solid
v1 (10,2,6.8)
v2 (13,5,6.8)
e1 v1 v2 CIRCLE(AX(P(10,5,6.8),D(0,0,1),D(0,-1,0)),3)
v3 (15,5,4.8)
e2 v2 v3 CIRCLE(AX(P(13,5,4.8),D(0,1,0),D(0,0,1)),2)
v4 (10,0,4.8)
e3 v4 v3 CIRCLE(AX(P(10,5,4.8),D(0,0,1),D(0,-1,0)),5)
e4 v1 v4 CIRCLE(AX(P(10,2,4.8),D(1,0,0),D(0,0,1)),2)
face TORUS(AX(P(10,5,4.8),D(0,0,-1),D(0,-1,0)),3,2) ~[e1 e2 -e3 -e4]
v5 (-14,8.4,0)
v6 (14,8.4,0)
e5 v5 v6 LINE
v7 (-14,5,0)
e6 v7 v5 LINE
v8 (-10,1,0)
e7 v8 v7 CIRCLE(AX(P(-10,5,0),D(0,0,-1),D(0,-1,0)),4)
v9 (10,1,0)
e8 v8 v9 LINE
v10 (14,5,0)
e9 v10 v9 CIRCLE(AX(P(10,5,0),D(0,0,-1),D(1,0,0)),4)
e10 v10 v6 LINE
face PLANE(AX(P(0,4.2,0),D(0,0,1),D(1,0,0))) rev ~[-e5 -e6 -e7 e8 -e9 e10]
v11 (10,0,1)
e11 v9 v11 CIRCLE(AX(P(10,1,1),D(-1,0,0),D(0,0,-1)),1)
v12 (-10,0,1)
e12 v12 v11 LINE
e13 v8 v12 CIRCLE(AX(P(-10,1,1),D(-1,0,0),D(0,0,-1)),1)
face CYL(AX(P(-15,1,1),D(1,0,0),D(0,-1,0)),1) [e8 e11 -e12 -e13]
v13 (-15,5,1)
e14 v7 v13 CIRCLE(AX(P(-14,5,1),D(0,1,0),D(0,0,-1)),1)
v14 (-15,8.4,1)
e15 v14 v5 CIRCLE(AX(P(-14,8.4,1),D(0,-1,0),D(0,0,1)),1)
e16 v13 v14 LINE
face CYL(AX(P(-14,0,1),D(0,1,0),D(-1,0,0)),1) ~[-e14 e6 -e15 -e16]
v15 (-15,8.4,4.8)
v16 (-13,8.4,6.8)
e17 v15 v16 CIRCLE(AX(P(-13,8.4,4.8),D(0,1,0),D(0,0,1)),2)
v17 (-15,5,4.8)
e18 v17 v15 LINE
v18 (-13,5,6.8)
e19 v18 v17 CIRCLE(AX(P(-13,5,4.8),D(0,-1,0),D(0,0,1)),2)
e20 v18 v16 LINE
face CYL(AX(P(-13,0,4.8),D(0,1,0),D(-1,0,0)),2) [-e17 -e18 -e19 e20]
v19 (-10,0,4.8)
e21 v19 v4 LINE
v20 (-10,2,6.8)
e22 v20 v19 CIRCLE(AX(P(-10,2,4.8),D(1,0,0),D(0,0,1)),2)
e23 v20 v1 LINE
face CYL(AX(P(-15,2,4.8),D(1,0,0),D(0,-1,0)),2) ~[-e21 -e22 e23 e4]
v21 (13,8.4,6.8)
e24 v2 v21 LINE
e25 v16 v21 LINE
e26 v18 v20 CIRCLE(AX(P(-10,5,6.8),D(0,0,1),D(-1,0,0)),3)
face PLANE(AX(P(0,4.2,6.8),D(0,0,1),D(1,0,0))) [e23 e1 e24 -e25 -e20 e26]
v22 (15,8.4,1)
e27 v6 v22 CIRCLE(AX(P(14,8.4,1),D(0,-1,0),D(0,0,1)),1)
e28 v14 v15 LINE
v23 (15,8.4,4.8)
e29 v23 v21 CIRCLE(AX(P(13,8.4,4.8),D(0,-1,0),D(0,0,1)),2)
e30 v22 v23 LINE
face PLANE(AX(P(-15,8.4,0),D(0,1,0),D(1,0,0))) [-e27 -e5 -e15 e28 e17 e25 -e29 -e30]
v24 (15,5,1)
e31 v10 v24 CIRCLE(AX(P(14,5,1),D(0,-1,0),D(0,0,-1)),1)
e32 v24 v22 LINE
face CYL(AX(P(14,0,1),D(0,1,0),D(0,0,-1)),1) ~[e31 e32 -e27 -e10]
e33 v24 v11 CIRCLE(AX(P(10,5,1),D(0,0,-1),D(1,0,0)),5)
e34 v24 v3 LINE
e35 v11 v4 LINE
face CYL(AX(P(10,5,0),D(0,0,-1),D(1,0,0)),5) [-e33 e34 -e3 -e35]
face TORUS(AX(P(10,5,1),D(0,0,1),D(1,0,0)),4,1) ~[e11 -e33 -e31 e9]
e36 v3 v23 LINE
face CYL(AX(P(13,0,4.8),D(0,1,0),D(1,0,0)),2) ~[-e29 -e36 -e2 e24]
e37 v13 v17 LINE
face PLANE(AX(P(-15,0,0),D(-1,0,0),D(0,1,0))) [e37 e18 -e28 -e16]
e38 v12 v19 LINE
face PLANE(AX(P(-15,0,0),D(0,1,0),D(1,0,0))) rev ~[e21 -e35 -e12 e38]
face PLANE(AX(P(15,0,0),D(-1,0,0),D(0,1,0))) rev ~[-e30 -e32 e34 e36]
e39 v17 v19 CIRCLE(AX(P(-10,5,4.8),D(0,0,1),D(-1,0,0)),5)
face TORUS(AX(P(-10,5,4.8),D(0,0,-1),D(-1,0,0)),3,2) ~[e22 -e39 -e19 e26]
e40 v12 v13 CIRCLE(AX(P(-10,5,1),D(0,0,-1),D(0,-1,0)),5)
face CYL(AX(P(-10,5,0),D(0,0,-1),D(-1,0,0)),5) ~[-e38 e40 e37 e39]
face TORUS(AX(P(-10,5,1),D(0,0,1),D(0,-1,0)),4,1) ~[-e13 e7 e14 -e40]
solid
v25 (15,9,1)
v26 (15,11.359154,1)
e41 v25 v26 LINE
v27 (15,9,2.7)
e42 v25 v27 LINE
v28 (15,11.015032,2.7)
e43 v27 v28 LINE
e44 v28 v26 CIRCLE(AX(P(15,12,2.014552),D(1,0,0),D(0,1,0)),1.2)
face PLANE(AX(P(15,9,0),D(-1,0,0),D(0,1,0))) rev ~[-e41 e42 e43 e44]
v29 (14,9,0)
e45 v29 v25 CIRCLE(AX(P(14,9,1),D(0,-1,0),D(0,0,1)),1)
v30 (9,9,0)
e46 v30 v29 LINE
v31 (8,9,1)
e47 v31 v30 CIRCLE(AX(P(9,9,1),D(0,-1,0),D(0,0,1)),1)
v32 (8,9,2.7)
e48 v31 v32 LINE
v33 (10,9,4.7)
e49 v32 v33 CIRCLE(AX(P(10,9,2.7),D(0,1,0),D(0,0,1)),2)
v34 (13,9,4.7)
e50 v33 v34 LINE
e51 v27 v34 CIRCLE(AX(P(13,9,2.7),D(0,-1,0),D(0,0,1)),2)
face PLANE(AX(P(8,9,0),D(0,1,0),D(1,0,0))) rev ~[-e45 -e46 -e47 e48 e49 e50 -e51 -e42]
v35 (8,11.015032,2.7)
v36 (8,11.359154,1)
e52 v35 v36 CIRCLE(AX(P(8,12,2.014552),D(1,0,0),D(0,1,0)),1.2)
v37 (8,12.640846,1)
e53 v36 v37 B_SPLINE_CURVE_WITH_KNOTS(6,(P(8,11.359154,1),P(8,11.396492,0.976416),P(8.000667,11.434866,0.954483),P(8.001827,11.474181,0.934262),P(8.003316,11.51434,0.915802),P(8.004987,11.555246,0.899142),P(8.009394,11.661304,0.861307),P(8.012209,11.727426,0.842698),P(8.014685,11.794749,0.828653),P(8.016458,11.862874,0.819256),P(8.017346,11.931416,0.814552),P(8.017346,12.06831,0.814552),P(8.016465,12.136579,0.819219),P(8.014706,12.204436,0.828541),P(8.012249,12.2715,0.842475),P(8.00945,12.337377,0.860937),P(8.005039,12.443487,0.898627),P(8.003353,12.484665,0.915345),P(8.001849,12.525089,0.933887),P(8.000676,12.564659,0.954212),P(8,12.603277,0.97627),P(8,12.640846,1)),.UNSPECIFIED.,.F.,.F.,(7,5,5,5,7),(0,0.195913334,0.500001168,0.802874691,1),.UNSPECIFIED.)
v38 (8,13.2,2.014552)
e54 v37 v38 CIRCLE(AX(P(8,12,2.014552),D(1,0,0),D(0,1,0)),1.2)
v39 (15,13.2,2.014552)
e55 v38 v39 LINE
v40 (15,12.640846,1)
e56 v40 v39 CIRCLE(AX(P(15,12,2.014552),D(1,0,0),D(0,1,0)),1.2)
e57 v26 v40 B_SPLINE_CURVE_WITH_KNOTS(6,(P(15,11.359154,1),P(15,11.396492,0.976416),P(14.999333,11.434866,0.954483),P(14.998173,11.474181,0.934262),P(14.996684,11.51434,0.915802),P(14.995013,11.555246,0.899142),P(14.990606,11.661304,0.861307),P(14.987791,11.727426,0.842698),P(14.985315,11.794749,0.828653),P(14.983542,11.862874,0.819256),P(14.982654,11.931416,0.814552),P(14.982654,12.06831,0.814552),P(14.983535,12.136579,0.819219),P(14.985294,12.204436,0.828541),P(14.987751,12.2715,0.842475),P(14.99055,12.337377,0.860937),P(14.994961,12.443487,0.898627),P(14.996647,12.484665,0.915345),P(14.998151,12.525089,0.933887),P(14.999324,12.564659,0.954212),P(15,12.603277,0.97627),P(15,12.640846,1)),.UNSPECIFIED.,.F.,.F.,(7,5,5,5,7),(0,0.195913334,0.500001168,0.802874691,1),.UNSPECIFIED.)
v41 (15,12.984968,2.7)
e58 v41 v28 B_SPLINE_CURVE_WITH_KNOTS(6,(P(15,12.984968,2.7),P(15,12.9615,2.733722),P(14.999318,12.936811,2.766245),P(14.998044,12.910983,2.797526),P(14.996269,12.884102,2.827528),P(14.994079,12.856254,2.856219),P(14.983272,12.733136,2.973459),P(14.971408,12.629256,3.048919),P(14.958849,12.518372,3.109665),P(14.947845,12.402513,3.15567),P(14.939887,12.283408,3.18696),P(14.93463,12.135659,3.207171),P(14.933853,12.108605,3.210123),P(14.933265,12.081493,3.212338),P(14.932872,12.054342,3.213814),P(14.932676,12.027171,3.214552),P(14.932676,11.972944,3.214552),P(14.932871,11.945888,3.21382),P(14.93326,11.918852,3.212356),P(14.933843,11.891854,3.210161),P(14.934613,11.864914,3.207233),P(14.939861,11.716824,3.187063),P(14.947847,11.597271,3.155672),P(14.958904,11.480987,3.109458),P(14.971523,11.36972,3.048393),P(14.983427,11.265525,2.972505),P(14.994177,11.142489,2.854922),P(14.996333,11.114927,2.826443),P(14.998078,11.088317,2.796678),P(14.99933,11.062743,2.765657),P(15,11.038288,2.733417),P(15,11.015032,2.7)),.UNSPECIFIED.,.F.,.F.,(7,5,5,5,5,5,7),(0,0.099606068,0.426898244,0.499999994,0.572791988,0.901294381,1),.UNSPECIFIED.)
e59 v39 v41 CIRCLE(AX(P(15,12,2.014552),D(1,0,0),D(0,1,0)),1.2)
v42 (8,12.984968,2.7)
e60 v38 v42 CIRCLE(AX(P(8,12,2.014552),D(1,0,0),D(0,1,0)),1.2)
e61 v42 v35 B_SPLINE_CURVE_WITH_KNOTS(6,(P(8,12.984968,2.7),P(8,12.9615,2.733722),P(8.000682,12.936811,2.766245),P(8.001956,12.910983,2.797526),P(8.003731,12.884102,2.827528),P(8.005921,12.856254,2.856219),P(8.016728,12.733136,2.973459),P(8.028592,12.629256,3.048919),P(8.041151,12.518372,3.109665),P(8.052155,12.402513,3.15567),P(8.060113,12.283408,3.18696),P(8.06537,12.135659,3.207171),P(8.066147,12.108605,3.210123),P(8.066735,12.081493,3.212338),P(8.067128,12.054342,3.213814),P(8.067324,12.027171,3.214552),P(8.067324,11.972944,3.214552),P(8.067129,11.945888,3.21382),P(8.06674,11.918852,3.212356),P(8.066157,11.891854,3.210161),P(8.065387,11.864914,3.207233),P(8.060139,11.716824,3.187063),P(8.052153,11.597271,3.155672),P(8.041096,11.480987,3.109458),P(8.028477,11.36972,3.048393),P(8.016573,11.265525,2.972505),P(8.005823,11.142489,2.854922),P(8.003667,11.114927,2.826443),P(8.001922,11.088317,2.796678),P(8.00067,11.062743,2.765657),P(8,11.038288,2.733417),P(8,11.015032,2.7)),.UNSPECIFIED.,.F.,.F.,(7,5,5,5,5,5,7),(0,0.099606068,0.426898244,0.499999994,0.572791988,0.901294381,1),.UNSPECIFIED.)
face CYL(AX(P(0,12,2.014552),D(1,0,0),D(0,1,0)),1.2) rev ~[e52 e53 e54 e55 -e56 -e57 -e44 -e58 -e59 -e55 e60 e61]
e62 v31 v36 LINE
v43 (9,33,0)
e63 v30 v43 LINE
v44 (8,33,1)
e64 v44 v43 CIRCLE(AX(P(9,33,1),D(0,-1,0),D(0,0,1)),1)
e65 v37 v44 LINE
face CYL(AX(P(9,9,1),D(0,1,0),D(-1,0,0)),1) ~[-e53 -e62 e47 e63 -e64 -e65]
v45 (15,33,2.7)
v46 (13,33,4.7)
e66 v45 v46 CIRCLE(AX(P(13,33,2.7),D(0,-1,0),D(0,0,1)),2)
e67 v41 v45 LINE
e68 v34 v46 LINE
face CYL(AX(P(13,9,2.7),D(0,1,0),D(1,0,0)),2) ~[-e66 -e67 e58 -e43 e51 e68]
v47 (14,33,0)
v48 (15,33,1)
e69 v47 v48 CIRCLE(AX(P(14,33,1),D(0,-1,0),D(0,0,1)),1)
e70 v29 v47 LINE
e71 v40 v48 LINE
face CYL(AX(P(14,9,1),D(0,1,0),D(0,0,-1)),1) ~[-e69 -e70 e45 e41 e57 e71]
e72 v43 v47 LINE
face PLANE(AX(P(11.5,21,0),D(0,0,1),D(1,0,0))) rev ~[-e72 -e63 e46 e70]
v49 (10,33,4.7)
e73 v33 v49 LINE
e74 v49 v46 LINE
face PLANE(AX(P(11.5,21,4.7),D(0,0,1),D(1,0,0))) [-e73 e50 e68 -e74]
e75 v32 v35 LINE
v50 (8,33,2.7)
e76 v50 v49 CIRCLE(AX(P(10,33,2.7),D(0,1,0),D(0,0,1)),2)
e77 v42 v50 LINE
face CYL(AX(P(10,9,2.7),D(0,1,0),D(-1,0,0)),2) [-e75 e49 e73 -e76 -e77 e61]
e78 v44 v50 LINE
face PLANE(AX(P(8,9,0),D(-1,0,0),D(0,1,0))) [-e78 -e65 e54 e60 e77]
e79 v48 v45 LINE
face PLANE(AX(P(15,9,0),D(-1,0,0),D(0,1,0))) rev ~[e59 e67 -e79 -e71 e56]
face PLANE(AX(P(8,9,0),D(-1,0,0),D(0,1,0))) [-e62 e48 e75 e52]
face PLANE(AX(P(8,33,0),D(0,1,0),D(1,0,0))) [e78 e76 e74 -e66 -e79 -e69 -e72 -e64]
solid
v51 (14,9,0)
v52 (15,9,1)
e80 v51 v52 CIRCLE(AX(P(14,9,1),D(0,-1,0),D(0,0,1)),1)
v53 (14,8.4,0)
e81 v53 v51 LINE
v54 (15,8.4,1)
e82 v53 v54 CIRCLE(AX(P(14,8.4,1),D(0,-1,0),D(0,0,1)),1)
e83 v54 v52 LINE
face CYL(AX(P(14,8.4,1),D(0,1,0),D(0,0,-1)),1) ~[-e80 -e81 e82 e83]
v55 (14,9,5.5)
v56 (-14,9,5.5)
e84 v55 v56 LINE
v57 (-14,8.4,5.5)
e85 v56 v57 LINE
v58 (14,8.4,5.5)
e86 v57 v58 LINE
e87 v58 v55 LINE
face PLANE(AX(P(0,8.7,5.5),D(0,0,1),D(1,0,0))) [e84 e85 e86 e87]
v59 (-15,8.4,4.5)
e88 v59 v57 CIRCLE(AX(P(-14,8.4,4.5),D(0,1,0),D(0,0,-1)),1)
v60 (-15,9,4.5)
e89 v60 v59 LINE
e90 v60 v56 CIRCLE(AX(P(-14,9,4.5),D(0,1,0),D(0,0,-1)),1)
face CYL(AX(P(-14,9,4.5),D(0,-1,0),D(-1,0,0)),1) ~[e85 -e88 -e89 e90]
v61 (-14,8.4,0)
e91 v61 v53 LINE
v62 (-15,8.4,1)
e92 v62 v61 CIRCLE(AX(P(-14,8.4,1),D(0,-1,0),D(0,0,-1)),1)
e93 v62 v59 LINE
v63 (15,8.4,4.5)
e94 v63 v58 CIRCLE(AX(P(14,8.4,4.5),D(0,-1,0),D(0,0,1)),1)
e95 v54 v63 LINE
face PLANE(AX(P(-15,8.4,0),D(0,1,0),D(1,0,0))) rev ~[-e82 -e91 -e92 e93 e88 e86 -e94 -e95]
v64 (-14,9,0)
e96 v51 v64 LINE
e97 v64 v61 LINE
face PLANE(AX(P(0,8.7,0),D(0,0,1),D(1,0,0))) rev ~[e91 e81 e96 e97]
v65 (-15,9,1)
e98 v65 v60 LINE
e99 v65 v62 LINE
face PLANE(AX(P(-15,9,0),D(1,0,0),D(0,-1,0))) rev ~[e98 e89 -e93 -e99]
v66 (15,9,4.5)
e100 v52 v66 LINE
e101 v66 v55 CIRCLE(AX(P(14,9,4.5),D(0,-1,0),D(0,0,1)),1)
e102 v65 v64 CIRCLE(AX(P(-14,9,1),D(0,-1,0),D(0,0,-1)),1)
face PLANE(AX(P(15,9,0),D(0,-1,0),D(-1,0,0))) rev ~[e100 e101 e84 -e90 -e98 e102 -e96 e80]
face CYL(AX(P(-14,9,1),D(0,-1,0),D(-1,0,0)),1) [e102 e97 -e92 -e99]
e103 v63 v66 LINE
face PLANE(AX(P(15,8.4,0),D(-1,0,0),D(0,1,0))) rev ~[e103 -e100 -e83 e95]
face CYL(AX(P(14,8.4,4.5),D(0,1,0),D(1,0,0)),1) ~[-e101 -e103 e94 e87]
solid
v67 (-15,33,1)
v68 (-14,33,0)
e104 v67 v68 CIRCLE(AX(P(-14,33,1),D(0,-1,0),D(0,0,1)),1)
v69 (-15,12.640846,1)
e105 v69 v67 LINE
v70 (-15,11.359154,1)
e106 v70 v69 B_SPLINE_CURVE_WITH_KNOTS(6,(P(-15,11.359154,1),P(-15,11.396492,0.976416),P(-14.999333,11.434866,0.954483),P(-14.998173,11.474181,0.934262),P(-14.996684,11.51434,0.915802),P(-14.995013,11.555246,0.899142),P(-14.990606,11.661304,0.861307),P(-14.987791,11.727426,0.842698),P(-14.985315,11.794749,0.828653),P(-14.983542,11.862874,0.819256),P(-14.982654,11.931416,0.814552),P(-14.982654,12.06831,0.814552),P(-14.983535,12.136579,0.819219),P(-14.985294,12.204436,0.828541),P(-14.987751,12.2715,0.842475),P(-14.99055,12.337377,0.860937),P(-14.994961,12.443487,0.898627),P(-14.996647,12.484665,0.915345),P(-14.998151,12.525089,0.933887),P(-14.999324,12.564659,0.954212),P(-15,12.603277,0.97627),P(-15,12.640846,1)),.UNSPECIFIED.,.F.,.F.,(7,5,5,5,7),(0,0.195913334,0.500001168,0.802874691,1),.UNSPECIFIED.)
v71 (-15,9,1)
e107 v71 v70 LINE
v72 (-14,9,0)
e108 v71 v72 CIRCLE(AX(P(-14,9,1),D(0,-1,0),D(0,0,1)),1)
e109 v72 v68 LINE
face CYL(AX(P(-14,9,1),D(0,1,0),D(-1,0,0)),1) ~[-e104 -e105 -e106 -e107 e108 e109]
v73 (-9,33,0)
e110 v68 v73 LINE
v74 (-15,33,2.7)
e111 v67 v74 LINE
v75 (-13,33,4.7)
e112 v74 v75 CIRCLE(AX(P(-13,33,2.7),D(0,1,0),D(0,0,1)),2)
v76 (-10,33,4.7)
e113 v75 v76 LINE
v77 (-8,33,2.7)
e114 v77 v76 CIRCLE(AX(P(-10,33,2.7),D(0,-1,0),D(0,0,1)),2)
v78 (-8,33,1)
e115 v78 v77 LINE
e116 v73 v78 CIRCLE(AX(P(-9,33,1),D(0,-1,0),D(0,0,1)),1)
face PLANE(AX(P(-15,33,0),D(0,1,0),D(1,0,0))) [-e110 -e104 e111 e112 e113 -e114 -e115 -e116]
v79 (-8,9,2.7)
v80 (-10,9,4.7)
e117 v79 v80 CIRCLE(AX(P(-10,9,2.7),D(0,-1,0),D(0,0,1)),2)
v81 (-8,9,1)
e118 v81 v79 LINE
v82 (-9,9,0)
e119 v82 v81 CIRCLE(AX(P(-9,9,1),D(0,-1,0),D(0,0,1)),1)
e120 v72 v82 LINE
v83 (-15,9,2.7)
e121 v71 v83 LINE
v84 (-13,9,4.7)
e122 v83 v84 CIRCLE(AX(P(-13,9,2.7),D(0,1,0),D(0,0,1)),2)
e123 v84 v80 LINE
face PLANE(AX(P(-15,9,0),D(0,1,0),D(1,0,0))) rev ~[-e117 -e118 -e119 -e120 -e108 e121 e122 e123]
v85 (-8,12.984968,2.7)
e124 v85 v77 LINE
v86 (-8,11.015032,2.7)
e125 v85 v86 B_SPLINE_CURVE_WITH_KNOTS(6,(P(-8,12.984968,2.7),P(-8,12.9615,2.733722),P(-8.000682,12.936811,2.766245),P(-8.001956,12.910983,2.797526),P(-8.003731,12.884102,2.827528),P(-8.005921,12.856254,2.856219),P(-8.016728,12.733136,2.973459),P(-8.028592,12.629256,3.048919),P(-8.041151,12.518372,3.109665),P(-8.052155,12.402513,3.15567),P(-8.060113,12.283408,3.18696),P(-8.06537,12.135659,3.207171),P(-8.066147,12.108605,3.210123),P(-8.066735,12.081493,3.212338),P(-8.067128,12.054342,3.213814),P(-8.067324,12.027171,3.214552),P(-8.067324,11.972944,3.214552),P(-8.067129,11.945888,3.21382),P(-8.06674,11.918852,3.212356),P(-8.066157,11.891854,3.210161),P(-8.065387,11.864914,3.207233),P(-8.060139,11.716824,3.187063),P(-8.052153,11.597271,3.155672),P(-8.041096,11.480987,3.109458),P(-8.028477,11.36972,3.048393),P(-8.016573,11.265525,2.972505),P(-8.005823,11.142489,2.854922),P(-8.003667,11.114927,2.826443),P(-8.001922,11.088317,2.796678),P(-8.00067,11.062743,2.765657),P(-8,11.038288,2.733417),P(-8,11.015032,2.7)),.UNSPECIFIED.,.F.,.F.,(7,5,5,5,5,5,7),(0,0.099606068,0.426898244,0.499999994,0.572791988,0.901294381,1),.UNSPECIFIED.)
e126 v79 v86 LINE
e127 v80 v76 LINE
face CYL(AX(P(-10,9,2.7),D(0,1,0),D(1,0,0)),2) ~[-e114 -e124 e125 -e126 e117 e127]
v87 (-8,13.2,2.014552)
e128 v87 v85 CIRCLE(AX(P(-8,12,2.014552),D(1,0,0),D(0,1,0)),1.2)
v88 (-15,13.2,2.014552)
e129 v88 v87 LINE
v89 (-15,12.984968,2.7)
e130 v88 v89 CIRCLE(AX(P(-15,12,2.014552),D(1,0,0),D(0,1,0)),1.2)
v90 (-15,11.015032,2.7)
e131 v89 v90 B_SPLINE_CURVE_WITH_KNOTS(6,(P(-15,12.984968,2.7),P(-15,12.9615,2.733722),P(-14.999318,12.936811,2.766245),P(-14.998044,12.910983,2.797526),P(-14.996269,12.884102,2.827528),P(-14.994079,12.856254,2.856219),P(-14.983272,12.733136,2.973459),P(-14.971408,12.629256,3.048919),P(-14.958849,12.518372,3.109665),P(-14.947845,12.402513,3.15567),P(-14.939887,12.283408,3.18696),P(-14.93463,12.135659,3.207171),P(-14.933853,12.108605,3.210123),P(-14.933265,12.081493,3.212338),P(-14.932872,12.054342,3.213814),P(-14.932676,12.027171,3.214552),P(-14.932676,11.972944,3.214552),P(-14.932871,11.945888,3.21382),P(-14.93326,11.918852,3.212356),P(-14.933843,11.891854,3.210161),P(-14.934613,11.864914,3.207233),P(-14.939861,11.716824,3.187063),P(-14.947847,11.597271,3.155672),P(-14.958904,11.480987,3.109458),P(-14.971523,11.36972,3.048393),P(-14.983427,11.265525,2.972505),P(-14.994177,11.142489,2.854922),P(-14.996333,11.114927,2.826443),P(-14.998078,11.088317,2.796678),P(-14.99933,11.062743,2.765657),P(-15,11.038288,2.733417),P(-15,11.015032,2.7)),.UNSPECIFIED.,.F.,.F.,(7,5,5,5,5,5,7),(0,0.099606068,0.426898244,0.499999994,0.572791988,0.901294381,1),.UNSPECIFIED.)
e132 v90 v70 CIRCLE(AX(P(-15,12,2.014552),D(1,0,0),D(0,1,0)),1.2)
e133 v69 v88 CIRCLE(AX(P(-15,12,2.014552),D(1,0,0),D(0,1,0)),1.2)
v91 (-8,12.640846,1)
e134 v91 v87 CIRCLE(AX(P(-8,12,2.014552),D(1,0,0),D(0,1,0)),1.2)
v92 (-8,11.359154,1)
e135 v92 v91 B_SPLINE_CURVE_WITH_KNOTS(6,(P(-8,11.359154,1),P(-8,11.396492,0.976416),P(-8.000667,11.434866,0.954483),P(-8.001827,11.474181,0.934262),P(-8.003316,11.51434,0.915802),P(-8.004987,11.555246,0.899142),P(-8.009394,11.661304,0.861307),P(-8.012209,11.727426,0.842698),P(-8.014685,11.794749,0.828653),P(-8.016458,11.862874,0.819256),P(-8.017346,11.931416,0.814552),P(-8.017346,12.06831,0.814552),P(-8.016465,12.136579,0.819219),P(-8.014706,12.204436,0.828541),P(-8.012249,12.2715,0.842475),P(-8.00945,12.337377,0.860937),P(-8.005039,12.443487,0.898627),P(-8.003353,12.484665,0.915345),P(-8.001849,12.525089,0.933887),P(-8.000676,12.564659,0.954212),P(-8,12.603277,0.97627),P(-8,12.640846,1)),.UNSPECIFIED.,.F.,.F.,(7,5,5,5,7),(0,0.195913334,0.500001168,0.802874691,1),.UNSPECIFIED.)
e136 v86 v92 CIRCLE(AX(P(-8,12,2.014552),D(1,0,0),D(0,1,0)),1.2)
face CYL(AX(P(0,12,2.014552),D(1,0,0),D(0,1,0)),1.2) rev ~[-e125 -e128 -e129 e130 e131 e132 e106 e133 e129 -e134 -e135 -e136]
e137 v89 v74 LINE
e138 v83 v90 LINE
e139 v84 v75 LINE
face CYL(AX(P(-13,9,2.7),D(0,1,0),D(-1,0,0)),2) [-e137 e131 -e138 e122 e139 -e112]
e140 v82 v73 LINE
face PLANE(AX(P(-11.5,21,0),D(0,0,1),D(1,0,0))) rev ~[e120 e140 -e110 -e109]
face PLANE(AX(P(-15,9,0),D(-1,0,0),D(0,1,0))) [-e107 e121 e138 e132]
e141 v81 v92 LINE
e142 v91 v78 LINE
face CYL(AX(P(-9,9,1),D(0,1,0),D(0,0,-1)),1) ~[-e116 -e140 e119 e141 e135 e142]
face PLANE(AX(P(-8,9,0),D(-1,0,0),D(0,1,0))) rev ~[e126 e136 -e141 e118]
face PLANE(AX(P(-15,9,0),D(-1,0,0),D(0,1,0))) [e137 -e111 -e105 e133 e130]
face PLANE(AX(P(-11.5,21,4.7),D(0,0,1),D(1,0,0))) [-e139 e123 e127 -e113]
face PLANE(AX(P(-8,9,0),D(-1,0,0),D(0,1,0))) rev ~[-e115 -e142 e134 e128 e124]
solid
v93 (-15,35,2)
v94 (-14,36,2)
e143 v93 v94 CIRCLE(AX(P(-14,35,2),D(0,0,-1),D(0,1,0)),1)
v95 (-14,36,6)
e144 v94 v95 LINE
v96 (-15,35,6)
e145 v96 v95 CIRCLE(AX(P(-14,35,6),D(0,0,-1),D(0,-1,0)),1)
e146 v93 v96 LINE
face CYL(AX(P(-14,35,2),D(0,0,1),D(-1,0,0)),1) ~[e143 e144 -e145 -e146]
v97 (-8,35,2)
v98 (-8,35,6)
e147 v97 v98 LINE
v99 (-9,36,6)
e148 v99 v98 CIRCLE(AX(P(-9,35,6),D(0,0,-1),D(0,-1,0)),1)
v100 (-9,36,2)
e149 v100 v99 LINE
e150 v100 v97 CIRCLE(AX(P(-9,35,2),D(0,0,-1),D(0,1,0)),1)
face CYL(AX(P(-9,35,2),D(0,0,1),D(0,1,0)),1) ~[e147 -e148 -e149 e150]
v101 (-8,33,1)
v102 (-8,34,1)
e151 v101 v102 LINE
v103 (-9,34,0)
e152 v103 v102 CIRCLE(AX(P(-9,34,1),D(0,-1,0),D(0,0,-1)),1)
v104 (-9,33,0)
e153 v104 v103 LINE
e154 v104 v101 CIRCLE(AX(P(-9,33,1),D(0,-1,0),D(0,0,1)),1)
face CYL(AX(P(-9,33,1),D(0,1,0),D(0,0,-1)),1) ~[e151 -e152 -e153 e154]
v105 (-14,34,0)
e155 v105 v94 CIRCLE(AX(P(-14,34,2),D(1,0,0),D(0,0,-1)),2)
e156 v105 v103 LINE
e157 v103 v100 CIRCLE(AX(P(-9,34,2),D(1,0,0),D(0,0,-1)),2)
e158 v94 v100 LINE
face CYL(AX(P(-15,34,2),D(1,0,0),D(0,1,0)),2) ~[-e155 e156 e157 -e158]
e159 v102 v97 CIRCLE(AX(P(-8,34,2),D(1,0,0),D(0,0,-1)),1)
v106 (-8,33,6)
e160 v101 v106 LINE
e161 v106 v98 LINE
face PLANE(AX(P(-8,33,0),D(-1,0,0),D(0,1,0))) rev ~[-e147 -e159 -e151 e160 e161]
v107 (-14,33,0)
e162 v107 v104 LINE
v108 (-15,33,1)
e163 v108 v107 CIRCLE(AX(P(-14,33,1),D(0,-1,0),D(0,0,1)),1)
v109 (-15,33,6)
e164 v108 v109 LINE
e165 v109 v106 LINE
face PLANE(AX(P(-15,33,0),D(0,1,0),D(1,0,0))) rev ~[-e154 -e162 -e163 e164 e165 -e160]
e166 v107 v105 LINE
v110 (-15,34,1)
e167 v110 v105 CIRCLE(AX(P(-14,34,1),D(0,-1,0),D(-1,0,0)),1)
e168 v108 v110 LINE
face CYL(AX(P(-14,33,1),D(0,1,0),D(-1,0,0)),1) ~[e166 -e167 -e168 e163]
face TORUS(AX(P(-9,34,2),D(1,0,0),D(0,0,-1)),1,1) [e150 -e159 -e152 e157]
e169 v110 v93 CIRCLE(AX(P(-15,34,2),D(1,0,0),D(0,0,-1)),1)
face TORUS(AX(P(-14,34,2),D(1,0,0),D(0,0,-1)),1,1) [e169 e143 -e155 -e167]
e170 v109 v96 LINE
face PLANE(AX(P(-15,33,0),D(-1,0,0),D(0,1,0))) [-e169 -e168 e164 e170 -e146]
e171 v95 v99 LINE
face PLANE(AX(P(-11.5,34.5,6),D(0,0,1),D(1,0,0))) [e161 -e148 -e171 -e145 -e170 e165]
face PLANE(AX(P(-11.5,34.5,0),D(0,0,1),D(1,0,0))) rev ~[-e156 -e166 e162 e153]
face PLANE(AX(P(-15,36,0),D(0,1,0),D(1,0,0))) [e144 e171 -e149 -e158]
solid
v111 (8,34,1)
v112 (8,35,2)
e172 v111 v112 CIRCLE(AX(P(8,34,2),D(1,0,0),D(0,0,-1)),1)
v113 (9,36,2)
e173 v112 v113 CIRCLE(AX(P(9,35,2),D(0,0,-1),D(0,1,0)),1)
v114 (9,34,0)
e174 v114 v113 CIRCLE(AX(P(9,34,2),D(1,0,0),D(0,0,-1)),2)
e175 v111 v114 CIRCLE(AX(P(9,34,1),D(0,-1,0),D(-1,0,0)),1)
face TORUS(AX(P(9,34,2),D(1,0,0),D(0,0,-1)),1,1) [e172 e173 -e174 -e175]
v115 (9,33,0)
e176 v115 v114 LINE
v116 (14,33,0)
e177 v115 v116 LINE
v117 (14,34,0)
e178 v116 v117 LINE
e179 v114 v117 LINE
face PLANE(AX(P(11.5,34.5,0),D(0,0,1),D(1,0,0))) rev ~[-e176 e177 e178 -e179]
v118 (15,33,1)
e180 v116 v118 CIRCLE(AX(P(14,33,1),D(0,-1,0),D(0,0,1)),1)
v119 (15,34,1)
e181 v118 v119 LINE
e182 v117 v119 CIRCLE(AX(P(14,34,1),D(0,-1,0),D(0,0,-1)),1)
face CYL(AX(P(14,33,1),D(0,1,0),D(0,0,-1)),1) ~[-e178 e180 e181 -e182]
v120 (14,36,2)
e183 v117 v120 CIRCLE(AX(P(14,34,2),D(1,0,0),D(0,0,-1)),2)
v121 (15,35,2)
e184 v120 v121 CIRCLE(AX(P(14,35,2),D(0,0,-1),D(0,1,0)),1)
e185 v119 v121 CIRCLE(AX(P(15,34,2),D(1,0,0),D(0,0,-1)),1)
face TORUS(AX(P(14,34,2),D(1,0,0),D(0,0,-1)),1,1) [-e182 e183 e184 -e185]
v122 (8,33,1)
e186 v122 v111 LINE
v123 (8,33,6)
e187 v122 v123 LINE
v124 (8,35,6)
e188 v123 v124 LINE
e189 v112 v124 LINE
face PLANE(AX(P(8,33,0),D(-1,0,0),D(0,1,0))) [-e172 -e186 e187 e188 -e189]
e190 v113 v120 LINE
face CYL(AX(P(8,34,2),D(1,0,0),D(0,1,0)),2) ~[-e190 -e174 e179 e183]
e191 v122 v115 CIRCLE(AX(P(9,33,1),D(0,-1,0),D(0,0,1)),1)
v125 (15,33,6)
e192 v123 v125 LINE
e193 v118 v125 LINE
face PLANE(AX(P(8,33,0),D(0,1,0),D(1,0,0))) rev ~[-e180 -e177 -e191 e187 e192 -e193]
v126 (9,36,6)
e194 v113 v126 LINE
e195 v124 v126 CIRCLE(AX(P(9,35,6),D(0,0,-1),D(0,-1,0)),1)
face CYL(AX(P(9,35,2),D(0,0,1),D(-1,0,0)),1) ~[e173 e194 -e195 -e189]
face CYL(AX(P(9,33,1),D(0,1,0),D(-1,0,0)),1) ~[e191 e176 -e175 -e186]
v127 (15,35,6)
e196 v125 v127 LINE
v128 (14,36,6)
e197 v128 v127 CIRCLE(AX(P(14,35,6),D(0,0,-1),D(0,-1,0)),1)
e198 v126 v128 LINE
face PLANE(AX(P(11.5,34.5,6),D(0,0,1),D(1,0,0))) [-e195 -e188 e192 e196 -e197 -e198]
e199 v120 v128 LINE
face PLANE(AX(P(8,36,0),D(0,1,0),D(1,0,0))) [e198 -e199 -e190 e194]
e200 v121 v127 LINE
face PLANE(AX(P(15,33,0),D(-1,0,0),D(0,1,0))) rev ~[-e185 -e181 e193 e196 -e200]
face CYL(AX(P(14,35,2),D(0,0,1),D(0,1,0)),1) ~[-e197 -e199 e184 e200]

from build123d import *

# Parameters (mm, degrees)
F0_W         = 30
F0_H         = 8.4
F1_DEPTH     = 6.8
F0_W_2       = 7
F0_H_2       = 24
F2_DEPTH     = 4.7
F0_H_3       = 3
F3_DEPTH     = 6
F4_DEPTH     = 5.5
F5_R         = 2
F5_2_R       = 2
F5_3_R       = 2
F5_4_R       = 2
F5_5_R       = 2
F6_R         = 1
F7_R         = 1
F7_2_R       = 1
F7_3_R       = 1
F7_4_R       = 1
F7_5_R       = 1
F7_6_R       = 1
F8_T1_DEPTH  = 6.8
F8_T4_ANGLE  = 90
F8_T6_ANGLE  = 90
F8_T8_ANGLE  = 90
F8_T10_ANGLE = 90
F9_R         = 1.2
F10_DEPTH    = 55.5


# Not quite as in the source:
# - a fillet or chamfer that OpenCascade refuses, or shapes differently, is made with other operations: its cross-section is extruded or revolved along the edge and cut away or added


with BuildPart() as f1:
    # F0 (on Top) → F1 (new body)
    with BuildSketch(Plane.XY):
        with Locations((0, 4.2)):
            Rectangle(F0_W, F0_H)
    extrude(amount=F1_DEPTH)

    # F5#3
    f5_3_edges = [f1.edges().sort_by_distance(p)[0] for p in [
        (15, 4.2, 6.8),
        (-15, 4.2, 6.8),
        (0, 0, 6.8),
    ]]
    fillet(f5_3_edges, radius=F5_3_R)

    # F7#4
    f7_4_edges = [f1.edges().sort_by_distance(p)[0] for p in [
        (15, 4.2, 0),
        (0, 0, 0),
        (-15, 4.2, 0),
    ]]
    fillet(f7_4_edges, radius=F7_4_R)

    # F8: fillet of radius 5 on 2 edges, made by hand

    # F8_s2 → F8_t1 (cut)
    with BuildSketch(Plane.XY):
        with BuildLine():
            ThreePointArc((15, 5), (13.5355339059, 1.4644660941), (10, 0))
            Line((10, 0), (15, 0))
            Line((15, 0), (15, 5))
        make_face()
        with BuildLine():
            ThreePointArc((-15, 5), (-13.5355339059, 1.4644660941), (-10, 0))
            Line((-10, 0), (-15, 0))
            Line((-15, 0), (-15, 5))
        make_face()
    extrude(amount=F8_T1_DEPTH, mode=Mode.SUBTRACT)

    # F8_s3 → F8_t4 (revolve, cut)
    with BuildSketch(Plane.YZ.offset(-10)):
        with BuildLine():
            ThreePointArc((1, 0), (0.2928932188, 0.2928932188), (0, 1))
            Line((0, 1), (0, 0))
            Line((0, 0), (1, 0))
        make_face()
    revolve(axis=Axis((-10, 5, 0), (0, 0, -1)), revolution_arc=F8_T4_ANGLE, mode=Mode.SUBTRACT)

    # F8_s5 → F8_t6 (revolve, cut)
    with BuildSketch(Plane.XZ.offset(-5)):
        with BuildLine():
            ThreePointArc((-13, 6.8), (-14.4142135624, 6.2142135624), (-15, 4.8))
            Line((-15, 4.8), (-15, 6.8))
            Line((-15, 6.8), (-13, 6.8))
        make_face()
    revolve(axis=Axis((-10, 5, 6.8), (0, 0, 1)), revolution_arc=F8_T6_ANGLE, mode=Mode.SUBTRACT)

    # F8_s7 → F8_t8 (revolve, cut)
    with BuildSketch(Plane.XZ.offset(-5)):
        with BuildLine():
            ThreePointArc((14, 0), (14.7071067812, 0.2928932188), (15, 1))
            Line((15, 1), (15, 0))
            Line((15, 0), (14, 0))
        make_face()
    revolve(axis=Axis((10, 5, 0), (0, 0, -1)), revolution_arc=F8_T8_ANGLE, mode=Mode.SUBTRACT)

    # F8_s9 → F8_t10 (revolve, cut)
    with BuildSketch(Plane.YZ.offset(10)):
        with BuildLine():
            ThreePointArc((2, 6.8), (0.5857864376, 6.2142135624), (0, 4.8))
            Line((0, 4.8), (0, 6.8))
            Line((0, 6.8), (2, 6.8))
        make_face()
    revolve(axis=Axis((10, 5, 6.8), (0, 0, 1)), revolution_arc=F8_T10_ANGLE, mode=Mode.SUBTRACT)


with BuildPart() as f2:
    # F0 (on Top) → F2 (new body)
    with BuildSketch(Plane.XY):
        with Locations((-11.5, 21)):
            Rectangle(F0_W_2, F0_H_2)
    extrude(amount=F2_DEPTH)

    # F5#4
    f5_4_edges = [f2.edges().sort_by_distance(p)[0] for p in [
        (-15, 21, 4.7),
        (-8, 21, 4.7),
    ]]
    fillet(f5_4_edges, radius=F5_4_R)

    # F7#5
    f7_5_edges = [f2.edges().sort_by_distance(p)[0] for p in [
        (-8, 21, 0),
        (-15, 21, 0),
    ]]
    fillet(f7_5_edges, radius=F7_5_R)


with BuildPart() as f2b:
    # F0 (on Top) → F2, piece 2 (new body)
    with BuildSketch(Plane.XY):
        with Locations((11.5, 21)):
            Rectangle(F0_W_2, F0_H_2)
    extrude(amount=F2_DEPTH)

    # F5#5
    f5_5_edges = [f2b.edges().sort_by_distance(p)[0] for p in [
        (8, 21, 4.7),
        (15, 21, 4.7),
    ]]
    fillet(f5_5_edges, radius=F5_5_R)

    # F7#2
    f7_2_edges = [f2b.edges().sort_by_distance(p)[0] for p in [
        (15, 21, 0),
        (8, 21, 0),
    ]]
    fillet(f7_2_edges, radius=F7_2_R)


with BuildPart() as f3:
    # F0 (on Top) → F3 (new body)
    with BuildSketch(Plane.XY):
        with Locations((-11.5, 34.5)):
            Rectangle(F0_W_2, F0_H_3)
    extrude(amount=F3_DEPTH)

    # F5#2
    f5_2_edges = [f3.edges().sort_by_distance(p)[0] for p in [
        (-11.5, 36, 0),
    ]]
    fillet(f5_2_edges, radius=F5_2_R)

    # F7#6
    f7_6_edges = [f3.edges().sort_by_distance(p)[0] for p in [
        (-15, 33.5, 0),
        (-15, 35.414214, 0.585786),
        (-8, 33.5, 0),
        (-8, 35.414214, 0.585786),
        (-15, 36, 4),
        (-8, 36, 4),
    ]]
    fillet(f7_6_edges, radius=F7_6_R)


with BuildPart() as f3b:
    # F0 (on Top) → F3, piece 2 (new body)
    with BuildSketch(Plane.XY):
        with Locations((11.5, 34.5)):
            Rectangle(F0_W_2, F0_H_3)
    extrude(amount=F3_DEPTH)

    # F5
    f5_edges = [f3b.edges().sort_by_distance(p)[0] for p in [
        (11.5, 36, 0),
    ]]
    fillet(f5_edges, radius=F5_R)

    # F7
    f7_edges = [f3b.edges().sort_by_distance(p)[0] for p in [
        (15, 33.5, 0),
        (15, 35.414214, 0.585786),
        (8, 33.5, 0),
        (8, 35.414214, 0.585786),
        (8, 36, 4),
        (15, 36, 4),
    ]]
    fillet(f7_edges, radius=F7_R)


with BuildPart() as f4:
    # F0 (on Top) → F4 (new body)
    with BuildSketch(Plane.XY):
        Polygon((-8, 9), (-15, 9), (-15, 8.4), (15, 8.4), (15, 9), (8, 9), align=None)
    extrude(amount=F4_DEPTH)

    # F6
    f6_edges = [f4.edges().sort_by_distance(p)[0] for p in [
        (15, 8.7, 5.5),
        (-15, 8.7, 5.5),
    ]]
    fillet(f6_edges, radius=F6_R)

    # F7#3
    f7_3_edges = [f4.edges().sort_by_distance(p)[0] for p in [
        (15, 8.7, 0),
        (-15, 8.7, 0),
    ]]
    fillet(f7_3_edges, radius=F7_3_R)


with BuildPart() as f10_tool:
    # F9 (on Right) → F10 (new body, symmetric)
    with BuildSketch(Plane.YZ):
        with Locations((12, 2.0145524759)):
            Circle(F9_R)
    extrude(amount=F10_DEPTH, both=True)


with BuildPart() as f2_1:
    add(f2.part)

    # F10: cut by f10_tool
    add(f10_tool.part, mode=Mode.SUBTRACT)


with BuildPart() as f2b_1:
    add(f2b.part)

    # F10: cut by f10_tool
    add(f10_tool.part, mode=Mode.SUBTRACT)


solid = Compound([f1.part, f3.part, f3b.part, f4.part, f2_1.part, f2b_1.part])
